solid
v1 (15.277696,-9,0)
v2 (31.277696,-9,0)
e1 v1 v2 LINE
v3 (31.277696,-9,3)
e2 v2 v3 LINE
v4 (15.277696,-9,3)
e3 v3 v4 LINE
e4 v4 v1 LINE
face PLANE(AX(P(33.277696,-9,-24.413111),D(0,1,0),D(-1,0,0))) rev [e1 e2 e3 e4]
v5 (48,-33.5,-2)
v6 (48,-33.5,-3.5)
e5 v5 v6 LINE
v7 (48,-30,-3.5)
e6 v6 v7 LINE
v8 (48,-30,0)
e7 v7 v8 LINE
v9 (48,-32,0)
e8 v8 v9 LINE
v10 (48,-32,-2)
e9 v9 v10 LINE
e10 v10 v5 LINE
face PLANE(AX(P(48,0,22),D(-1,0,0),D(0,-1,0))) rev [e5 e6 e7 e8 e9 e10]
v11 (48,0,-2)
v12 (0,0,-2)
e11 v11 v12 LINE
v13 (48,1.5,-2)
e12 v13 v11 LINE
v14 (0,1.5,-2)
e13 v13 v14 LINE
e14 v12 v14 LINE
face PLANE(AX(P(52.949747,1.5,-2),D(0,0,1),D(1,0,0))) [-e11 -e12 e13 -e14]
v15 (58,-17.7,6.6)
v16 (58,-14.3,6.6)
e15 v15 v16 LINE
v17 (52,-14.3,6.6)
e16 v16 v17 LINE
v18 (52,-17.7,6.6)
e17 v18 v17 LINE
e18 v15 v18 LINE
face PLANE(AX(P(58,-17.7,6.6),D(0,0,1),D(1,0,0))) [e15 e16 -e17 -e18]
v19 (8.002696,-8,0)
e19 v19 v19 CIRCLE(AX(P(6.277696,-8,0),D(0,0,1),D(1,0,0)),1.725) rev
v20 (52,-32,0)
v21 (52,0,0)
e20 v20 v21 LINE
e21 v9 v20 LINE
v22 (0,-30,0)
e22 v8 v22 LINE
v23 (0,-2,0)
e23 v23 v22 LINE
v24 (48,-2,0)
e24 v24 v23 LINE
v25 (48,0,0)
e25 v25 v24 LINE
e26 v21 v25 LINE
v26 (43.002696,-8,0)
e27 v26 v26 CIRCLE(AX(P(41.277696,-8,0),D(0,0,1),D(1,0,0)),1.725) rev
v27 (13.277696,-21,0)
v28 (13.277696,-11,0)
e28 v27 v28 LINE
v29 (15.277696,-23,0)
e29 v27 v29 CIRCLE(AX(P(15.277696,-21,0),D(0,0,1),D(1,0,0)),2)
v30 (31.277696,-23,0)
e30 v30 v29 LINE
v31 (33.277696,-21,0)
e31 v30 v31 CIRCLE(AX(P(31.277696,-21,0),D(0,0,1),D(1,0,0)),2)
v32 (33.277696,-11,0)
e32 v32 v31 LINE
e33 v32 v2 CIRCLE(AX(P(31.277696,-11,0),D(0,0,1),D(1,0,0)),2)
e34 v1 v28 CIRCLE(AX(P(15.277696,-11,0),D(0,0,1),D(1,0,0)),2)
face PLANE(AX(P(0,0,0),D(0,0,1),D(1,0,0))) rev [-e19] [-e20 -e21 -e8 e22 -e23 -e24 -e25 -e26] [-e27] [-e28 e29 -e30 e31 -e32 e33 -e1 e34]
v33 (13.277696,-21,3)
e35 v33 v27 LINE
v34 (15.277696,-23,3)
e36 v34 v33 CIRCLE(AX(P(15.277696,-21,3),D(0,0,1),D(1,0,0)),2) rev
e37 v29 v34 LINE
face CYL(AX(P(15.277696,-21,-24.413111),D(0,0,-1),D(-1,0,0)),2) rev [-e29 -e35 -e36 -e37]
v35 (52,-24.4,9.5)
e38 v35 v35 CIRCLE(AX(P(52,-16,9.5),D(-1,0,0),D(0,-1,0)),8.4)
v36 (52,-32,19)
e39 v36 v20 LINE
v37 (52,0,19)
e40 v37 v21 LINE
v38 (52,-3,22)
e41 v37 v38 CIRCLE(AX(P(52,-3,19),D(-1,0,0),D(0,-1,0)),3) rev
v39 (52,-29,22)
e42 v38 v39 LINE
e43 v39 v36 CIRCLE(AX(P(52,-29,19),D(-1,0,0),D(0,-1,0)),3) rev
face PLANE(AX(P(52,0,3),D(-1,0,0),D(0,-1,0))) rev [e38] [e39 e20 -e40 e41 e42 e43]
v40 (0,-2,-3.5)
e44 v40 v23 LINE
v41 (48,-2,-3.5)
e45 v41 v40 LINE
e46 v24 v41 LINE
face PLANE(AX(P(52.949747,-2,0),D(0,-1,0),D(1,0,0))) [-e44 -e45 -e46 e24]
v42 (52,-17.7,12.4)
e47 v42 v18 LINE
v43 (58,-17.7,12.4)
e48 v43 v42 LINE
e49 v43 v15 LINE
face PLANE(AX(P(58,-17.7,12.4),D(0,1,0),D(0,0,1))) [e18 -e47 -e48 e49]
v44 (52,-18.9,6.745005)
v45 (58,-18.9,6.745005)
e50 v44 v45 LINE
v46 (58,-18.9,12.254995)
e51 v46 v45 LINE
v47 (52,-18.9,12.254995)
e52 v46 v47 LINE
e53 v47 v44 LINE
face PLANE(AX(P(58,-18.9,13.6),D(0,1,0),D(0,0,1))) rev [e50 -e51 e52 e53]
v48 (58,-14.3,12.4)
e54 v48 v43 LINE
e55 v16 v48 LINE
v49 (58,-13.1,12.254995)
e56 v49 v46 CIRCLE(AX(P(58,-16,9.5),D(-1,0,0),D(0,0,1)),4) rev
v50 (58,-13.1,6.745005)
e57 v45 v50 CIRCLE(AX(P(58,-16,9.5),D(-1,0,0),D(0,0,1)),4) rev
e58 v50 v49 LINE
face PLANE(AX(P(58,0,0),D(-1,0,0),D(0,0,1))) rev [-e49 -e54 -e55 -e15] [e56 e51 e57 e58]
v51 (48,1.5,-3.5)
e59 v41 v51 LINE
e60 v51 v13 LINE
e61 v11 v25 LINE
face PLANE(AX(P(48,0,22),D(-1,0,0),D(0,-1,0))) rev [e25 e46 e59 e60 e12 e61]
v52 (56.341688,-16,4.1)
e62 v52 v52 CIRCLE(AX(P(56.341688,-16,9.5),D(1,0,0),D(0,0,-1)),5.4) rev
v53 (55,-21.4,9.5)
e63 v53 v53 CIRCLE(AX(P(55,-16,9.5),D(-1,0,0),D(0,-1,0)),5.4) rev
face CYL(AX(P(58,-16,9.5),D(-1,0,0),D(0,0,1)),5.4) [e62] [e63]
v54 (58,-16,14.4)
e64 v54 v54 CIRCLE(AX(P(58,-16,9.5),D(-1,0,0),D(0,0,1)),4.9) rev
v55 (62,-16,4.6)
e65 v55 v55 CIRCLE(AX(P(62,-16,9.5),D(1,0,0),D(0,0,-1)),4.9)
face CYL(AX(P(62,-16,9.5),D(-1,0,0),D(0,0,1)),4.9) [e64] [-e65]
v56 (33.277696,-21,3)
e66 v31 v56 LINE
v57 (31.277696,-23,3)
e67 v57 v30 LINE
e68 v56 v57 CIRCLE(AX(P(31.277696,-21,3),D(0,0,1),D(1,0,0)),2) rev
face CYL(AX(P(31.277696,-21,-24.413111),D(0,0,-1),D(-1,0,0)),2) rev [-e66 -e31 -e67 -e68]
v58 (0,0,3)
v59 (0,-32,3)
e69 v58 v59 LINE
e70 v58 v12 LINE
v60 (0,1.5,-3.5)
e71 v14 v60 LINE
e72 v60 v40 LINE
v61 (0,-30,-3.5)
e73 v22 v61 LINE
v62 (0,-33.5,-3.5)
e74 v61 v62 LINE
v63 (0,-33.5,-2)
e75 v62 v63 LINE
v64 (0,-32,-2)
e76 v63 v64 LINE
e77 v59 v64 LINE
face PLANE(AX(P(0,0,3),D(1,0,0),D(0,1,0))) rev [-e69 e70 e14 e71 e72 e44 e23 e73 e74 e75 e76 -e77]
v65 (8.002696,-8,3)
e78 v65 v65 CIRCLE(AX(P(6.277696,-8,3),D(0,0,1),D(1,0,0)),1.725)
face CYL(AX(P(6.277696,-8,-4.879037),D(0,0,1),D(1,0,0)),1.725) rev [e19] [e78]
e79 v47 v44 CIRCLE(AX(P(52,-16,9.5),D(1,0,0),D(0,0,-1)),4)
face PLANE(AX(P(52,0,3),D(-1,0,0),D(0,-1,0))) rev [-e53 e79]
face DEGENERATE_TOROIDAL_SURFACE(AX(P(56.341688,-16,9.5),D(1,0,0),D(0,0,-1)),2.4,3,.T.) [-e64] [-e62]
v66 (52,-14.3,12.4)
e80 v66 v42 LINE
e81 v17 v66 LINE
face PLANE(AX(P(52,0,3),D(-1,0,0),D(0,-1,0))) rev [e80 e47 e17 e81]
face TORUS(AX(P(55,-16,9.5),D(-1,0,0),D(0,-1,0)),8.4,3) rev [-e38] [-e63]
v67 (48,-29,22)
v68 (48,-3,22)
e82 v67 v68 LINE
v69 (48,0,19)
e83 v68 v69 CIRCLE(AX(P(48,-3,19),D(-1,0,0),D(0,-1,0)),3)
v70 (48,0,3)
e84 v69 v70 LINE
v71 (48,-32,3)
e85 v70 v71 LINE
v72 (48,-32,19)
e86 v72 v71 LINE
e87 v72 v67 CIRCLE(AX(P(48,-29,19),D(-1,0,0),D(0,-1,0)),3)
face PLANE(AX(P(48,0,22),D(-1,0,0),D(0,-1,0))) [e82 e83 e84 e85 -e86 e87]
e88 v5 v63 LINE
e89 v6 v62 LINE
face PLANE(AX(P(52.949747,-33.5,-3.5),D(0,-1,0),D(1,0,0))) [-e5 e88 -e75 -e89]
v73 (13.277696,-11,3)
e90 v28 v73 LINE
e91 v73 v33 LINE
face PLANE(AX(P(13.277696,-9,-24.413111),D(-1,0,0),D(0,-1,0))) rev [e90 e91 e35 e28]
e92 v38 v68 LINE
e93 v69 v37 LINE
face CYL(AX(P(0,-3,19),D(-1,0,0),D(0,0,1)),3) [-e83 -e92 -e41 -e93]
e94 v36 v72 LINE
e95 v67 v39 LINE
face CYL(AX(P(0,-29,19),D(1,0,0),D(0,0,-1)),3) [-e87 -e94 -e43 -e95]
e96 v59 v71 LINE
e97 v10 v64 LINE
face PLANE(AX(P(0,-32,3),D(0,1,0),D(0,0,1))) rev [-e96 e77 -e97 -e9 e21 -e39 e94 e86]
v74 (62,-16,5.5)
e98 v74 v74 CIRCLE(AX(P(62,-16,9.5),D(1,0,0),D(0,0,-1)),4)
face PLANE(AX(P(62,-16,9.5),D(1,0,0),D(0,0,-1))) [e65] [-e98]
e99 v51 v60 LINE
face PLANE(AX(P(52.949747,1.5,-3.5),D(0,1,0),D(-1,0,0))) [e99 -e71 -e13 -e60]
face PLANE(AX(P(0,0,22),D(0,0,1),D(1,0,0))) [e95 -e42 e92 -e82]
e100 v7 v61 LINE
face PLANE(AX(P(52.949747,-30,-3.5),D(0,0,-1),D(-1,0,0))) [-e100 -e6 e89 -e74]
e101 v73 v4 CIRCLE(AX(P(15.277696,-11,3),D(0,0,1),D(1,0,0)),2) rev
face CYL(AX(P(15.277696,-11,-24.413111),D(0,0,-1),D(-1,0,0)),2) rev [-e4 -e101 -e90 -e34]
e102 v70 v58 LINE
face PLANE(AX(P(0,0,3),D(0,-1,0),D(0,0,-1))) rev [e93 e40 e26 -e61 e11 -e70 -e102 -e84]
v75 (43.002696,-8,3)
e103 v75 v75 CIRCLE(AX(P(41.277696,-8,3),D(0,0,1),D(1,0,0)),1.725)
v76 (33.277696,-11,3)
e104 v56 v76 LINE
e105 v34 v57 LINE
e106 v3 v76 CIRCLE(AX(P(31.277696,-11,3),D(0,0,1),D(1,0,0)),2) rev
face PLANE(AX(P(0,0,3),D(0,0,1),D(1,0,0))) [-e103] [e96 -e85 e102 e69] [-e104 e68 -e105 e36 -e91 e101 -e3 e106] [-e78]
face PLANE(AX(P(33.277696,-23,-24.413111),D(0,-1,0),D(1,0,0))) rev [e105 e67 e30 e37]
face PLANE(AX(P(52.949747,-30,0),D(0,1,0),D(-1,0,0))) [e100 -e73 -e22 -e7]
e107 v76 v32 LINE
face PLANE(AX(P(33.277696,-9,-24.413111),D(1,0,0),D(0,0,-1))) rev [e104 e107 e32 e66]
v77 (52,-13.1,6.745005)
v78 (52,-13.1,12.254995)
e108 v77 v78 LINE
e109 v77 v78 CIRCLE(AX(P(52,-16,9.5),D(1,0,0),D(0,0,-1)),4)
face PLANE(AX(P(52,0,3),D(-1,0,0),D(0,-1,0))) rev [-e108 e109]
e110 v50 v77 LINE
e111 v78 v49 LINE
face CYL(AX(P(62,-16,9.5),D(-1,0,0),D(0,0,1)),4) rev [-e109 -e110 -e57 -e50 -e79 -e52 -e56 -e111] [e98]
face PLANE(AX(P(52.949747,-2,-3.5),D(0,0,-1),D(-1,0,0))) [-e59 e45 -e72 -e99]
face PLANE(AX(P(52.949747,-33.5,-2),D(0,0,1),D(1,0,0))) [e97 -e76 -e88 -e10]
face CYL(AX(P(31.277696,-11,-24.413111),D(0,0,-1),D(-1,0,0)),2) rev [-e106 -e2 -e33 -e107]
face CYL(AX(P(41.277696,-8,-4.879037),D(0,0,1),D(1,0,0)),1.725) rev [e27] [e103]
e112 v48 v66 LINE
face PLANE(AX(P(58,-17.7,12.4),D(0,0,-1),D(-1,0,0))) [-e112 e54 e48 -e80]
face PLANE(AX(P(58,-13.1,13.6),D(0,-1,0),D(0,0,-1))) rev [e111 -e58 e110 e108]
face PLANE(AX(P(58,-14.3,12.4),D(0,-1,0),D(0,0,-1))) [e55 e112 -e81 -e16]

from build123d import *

# Parameters (mm, degrees)
SKETCH1_W           = 52
SKETCH1_H           = 32
BOSS_EXTRUDE1_DEPTH = 3
SKETCH2_W           = 4
SKETCH2_H           = 32
BOSS_EXTRUDE2_DEPTH = 20
FILLET1_R           = 3
SKETCH4_R           = 1.725
CUT_EXTRUDE2_DEPTH  = 3
SKETCH6_W           = 20
SKETCH6_H           = 14
CUT_EXTRUDE3_DEPTH  = 3
SKETCH7_W           = 8.2
SKETCH7_H           = 5.8
SKETCH7_W_2         = 5.8
SKETCH7_H_2         = 3.4
BOSS_EXTRUDE4_DEPTH = 6
SKETCH10_R          = 4.9
SKETCH10_R_2        = 4
BOSS_EXTRUDE6_DEPTH = 10
SKETCH8_R           = 5.4
SKETCH8_R_2         = 4.25
BOSS_EXTRUDE5_DEPTH = 6
FILLET2_R           = 2
FILLET3_R           = 3
BOSS_EXTRUDE7_DEPTH = 48


with BuildPart() as part:
    # Sketch1 → Boss-Extrude1 (new body)
    with BuildSketch(Plane.XY):
        with Locations((26, -16)):
            Rectangle(SKETCH1_W, SKETCH1_H)
    extrude(amount=BOSS_EXTRUDE1_DEPTH)

    # Sketch2 → Boss-Extrude2 (add)
    with BuildSketch(Plane(origin=(0, 0, 2), x_dir=(-1, 0, 0), z_dir=(0, 0, -1))):
        with Locations((-50, -16)):
            Rectangle(SKETCH2_W, SKETCH2_H)
    extrude(amount=-BOSS_EXTRUDE2_DEPTH)

    # Fillet1
    fillet1_edges = [part.edges().sort_by_distance(p)[0] for p in [
        (50, -32, 22),
        (50, 0, 22),
    ]]
    fillet(fillet1_edges, radius=FILLET1_R)

    # Sketch4 → Cut-Extrude2 (cut)
    with BuildSketch(Plane.XY.offset(3)):
        with Locations((41.277695867, -8)):
            Circle(SKETCH4_R)
        with Locations((6.277695867, -8)):
            Circle(SKETCH4_R)
    extrude(amount=-CUT_EXTRUDE2_DEPTH, mode=Mode.SUBTRACT)

    # Sketch6 → Cut-Extrude3 (cut)
    with BuildSketch(Plane.XY.offset(3)):
        with Locations((23.277695867, -16)):
            Rectangle(SKETCH6_W, SKETCH6_H)
    extrude(amount=-CUT_EXTRUDE3_DEPTH, mode=Mode.SUBTRACT)

    # Sketch7 → Boss-Extrude4 (add)
    with BuildSketch(Plane(origin=(52, 0, 0), x_dir=(0, 0, -1), z_dir=(1, 0, 0))):
        with Locations((-9.5, -16)):
            Rectangle(SKETCH7_W, SKETCH7_H)
        with Locations((-9.5, -16)):
            Rectangle(SKETCH7_W_2, SKETCH7_H_2, mode=Mode.SUBTRACT)
    extrude(amount=BOSS_EXTRUDE4_DEPTH)

    # Sketch10 → Boss-Extrude6 (add)
    with BuildSketch(Plane(origin=(52, 0, 0), x_dir=(0, 0, -1), z_dir=(1, 0, 0))):
        with Locations(Location((-9.5, -16, 0), (0, 0, 146.796900802))):
            Circle(SKETCH10_R)
        with Locations(Location((-9.5, -16, 0), (0, 0, 133.531152167))):
            Circle(SKETCH10_R_2, mode=Mode.SUBTRACT)
    extrude(amount=BOSS_EXTRUDE6_DEPTH)

    # Sketch8 → Boss-Extrude5 (add)
    with BuildSketch(Plane(origin=(52, 0, 0), x_dir=(0, 0, -1), z_dir=(1, 0, 0))):
        with Locations(Location((-9.5, -16, 0), (0, 0, 270))):
            Circle(SKETCH8_R)
        with Locations((-9.5, -16)):
            Circle(SKETCH8_R_2, mode=Mode.SUBTRACT)
    extrude(amount=BOSS_EXTRUDE5_DEPTH)

    # Fillet2
    fillet2_edges = [part.edges().sort_by_distance(p)[0] for p in [
        (33.277695867, -9, 1.5),
        (33.277695867, -23, 1.5),
        (13.277695867, -23, 1.5),
        (13.277695867, -9, 1.5),
    ]]
    fillet(fillet2_edges, radius=FILLET2_R)

    # Fillet3
    # the kernel refuses this fillet: 3 mm, written as the material it adds along each edge
    with BuildSketch(Plane(origin=(52, -16, 9.5), x_dir=(0, -1, 0), z_dir=(0, 0, 1))) as fillet3_piece_1:
        with BuildLine():
            CenterArc((5.4 + FILLET3_R, FILLET3_R), FILLET3_R, 180, 90)
            Line((5.4, FILLET3_R), (5.4, 0))
            Line((5.4, 0), (5.4 + FILLET3_R, 0))
        make_face()
    revolve(axis=Axis((52, -16, 9.5), (1, 0, 0)))
    # the kernel refuses this fillet: 3 mm, written as the material it takes off along each edge
    with BuildSketch(Plane(origin=(58, -16, 9.5), x_dir=(0, -1, 0), z_dir=(0, 0, 1))) as fillet3_2_piece_1:
        with BuildLine():
            CenterArc((2.4, -1.658312395), FILLET3_R, 0, 33.557309762)
            Line((4.9, 0), (5.4, 0))
            Line((5.4, 0), (5.4, -1.658312395))
        make_face()
    revolve(axis=Axis((58, -16, 9.5), (1, 0, 0)), mode=Mode.SUBTRACT)

    # Sketch15 → Boss-Extrude7 (add)
    with BuildSketch(Plane.ZY):
        Polygon((-3.5, -2), (-3.5, 1.5), (-2, 1.5), (-2, 0), (0, 0), (0, -2), align=None)
        Polygon((-3.5, -33.5), (-2, -33.5), (-2, -32), (0, -32), (0, -30), (-3.5, -30), align=None)
    extrude(amount=-BOSS_EXTRUDE7_DEPTH)


solid = part.part
